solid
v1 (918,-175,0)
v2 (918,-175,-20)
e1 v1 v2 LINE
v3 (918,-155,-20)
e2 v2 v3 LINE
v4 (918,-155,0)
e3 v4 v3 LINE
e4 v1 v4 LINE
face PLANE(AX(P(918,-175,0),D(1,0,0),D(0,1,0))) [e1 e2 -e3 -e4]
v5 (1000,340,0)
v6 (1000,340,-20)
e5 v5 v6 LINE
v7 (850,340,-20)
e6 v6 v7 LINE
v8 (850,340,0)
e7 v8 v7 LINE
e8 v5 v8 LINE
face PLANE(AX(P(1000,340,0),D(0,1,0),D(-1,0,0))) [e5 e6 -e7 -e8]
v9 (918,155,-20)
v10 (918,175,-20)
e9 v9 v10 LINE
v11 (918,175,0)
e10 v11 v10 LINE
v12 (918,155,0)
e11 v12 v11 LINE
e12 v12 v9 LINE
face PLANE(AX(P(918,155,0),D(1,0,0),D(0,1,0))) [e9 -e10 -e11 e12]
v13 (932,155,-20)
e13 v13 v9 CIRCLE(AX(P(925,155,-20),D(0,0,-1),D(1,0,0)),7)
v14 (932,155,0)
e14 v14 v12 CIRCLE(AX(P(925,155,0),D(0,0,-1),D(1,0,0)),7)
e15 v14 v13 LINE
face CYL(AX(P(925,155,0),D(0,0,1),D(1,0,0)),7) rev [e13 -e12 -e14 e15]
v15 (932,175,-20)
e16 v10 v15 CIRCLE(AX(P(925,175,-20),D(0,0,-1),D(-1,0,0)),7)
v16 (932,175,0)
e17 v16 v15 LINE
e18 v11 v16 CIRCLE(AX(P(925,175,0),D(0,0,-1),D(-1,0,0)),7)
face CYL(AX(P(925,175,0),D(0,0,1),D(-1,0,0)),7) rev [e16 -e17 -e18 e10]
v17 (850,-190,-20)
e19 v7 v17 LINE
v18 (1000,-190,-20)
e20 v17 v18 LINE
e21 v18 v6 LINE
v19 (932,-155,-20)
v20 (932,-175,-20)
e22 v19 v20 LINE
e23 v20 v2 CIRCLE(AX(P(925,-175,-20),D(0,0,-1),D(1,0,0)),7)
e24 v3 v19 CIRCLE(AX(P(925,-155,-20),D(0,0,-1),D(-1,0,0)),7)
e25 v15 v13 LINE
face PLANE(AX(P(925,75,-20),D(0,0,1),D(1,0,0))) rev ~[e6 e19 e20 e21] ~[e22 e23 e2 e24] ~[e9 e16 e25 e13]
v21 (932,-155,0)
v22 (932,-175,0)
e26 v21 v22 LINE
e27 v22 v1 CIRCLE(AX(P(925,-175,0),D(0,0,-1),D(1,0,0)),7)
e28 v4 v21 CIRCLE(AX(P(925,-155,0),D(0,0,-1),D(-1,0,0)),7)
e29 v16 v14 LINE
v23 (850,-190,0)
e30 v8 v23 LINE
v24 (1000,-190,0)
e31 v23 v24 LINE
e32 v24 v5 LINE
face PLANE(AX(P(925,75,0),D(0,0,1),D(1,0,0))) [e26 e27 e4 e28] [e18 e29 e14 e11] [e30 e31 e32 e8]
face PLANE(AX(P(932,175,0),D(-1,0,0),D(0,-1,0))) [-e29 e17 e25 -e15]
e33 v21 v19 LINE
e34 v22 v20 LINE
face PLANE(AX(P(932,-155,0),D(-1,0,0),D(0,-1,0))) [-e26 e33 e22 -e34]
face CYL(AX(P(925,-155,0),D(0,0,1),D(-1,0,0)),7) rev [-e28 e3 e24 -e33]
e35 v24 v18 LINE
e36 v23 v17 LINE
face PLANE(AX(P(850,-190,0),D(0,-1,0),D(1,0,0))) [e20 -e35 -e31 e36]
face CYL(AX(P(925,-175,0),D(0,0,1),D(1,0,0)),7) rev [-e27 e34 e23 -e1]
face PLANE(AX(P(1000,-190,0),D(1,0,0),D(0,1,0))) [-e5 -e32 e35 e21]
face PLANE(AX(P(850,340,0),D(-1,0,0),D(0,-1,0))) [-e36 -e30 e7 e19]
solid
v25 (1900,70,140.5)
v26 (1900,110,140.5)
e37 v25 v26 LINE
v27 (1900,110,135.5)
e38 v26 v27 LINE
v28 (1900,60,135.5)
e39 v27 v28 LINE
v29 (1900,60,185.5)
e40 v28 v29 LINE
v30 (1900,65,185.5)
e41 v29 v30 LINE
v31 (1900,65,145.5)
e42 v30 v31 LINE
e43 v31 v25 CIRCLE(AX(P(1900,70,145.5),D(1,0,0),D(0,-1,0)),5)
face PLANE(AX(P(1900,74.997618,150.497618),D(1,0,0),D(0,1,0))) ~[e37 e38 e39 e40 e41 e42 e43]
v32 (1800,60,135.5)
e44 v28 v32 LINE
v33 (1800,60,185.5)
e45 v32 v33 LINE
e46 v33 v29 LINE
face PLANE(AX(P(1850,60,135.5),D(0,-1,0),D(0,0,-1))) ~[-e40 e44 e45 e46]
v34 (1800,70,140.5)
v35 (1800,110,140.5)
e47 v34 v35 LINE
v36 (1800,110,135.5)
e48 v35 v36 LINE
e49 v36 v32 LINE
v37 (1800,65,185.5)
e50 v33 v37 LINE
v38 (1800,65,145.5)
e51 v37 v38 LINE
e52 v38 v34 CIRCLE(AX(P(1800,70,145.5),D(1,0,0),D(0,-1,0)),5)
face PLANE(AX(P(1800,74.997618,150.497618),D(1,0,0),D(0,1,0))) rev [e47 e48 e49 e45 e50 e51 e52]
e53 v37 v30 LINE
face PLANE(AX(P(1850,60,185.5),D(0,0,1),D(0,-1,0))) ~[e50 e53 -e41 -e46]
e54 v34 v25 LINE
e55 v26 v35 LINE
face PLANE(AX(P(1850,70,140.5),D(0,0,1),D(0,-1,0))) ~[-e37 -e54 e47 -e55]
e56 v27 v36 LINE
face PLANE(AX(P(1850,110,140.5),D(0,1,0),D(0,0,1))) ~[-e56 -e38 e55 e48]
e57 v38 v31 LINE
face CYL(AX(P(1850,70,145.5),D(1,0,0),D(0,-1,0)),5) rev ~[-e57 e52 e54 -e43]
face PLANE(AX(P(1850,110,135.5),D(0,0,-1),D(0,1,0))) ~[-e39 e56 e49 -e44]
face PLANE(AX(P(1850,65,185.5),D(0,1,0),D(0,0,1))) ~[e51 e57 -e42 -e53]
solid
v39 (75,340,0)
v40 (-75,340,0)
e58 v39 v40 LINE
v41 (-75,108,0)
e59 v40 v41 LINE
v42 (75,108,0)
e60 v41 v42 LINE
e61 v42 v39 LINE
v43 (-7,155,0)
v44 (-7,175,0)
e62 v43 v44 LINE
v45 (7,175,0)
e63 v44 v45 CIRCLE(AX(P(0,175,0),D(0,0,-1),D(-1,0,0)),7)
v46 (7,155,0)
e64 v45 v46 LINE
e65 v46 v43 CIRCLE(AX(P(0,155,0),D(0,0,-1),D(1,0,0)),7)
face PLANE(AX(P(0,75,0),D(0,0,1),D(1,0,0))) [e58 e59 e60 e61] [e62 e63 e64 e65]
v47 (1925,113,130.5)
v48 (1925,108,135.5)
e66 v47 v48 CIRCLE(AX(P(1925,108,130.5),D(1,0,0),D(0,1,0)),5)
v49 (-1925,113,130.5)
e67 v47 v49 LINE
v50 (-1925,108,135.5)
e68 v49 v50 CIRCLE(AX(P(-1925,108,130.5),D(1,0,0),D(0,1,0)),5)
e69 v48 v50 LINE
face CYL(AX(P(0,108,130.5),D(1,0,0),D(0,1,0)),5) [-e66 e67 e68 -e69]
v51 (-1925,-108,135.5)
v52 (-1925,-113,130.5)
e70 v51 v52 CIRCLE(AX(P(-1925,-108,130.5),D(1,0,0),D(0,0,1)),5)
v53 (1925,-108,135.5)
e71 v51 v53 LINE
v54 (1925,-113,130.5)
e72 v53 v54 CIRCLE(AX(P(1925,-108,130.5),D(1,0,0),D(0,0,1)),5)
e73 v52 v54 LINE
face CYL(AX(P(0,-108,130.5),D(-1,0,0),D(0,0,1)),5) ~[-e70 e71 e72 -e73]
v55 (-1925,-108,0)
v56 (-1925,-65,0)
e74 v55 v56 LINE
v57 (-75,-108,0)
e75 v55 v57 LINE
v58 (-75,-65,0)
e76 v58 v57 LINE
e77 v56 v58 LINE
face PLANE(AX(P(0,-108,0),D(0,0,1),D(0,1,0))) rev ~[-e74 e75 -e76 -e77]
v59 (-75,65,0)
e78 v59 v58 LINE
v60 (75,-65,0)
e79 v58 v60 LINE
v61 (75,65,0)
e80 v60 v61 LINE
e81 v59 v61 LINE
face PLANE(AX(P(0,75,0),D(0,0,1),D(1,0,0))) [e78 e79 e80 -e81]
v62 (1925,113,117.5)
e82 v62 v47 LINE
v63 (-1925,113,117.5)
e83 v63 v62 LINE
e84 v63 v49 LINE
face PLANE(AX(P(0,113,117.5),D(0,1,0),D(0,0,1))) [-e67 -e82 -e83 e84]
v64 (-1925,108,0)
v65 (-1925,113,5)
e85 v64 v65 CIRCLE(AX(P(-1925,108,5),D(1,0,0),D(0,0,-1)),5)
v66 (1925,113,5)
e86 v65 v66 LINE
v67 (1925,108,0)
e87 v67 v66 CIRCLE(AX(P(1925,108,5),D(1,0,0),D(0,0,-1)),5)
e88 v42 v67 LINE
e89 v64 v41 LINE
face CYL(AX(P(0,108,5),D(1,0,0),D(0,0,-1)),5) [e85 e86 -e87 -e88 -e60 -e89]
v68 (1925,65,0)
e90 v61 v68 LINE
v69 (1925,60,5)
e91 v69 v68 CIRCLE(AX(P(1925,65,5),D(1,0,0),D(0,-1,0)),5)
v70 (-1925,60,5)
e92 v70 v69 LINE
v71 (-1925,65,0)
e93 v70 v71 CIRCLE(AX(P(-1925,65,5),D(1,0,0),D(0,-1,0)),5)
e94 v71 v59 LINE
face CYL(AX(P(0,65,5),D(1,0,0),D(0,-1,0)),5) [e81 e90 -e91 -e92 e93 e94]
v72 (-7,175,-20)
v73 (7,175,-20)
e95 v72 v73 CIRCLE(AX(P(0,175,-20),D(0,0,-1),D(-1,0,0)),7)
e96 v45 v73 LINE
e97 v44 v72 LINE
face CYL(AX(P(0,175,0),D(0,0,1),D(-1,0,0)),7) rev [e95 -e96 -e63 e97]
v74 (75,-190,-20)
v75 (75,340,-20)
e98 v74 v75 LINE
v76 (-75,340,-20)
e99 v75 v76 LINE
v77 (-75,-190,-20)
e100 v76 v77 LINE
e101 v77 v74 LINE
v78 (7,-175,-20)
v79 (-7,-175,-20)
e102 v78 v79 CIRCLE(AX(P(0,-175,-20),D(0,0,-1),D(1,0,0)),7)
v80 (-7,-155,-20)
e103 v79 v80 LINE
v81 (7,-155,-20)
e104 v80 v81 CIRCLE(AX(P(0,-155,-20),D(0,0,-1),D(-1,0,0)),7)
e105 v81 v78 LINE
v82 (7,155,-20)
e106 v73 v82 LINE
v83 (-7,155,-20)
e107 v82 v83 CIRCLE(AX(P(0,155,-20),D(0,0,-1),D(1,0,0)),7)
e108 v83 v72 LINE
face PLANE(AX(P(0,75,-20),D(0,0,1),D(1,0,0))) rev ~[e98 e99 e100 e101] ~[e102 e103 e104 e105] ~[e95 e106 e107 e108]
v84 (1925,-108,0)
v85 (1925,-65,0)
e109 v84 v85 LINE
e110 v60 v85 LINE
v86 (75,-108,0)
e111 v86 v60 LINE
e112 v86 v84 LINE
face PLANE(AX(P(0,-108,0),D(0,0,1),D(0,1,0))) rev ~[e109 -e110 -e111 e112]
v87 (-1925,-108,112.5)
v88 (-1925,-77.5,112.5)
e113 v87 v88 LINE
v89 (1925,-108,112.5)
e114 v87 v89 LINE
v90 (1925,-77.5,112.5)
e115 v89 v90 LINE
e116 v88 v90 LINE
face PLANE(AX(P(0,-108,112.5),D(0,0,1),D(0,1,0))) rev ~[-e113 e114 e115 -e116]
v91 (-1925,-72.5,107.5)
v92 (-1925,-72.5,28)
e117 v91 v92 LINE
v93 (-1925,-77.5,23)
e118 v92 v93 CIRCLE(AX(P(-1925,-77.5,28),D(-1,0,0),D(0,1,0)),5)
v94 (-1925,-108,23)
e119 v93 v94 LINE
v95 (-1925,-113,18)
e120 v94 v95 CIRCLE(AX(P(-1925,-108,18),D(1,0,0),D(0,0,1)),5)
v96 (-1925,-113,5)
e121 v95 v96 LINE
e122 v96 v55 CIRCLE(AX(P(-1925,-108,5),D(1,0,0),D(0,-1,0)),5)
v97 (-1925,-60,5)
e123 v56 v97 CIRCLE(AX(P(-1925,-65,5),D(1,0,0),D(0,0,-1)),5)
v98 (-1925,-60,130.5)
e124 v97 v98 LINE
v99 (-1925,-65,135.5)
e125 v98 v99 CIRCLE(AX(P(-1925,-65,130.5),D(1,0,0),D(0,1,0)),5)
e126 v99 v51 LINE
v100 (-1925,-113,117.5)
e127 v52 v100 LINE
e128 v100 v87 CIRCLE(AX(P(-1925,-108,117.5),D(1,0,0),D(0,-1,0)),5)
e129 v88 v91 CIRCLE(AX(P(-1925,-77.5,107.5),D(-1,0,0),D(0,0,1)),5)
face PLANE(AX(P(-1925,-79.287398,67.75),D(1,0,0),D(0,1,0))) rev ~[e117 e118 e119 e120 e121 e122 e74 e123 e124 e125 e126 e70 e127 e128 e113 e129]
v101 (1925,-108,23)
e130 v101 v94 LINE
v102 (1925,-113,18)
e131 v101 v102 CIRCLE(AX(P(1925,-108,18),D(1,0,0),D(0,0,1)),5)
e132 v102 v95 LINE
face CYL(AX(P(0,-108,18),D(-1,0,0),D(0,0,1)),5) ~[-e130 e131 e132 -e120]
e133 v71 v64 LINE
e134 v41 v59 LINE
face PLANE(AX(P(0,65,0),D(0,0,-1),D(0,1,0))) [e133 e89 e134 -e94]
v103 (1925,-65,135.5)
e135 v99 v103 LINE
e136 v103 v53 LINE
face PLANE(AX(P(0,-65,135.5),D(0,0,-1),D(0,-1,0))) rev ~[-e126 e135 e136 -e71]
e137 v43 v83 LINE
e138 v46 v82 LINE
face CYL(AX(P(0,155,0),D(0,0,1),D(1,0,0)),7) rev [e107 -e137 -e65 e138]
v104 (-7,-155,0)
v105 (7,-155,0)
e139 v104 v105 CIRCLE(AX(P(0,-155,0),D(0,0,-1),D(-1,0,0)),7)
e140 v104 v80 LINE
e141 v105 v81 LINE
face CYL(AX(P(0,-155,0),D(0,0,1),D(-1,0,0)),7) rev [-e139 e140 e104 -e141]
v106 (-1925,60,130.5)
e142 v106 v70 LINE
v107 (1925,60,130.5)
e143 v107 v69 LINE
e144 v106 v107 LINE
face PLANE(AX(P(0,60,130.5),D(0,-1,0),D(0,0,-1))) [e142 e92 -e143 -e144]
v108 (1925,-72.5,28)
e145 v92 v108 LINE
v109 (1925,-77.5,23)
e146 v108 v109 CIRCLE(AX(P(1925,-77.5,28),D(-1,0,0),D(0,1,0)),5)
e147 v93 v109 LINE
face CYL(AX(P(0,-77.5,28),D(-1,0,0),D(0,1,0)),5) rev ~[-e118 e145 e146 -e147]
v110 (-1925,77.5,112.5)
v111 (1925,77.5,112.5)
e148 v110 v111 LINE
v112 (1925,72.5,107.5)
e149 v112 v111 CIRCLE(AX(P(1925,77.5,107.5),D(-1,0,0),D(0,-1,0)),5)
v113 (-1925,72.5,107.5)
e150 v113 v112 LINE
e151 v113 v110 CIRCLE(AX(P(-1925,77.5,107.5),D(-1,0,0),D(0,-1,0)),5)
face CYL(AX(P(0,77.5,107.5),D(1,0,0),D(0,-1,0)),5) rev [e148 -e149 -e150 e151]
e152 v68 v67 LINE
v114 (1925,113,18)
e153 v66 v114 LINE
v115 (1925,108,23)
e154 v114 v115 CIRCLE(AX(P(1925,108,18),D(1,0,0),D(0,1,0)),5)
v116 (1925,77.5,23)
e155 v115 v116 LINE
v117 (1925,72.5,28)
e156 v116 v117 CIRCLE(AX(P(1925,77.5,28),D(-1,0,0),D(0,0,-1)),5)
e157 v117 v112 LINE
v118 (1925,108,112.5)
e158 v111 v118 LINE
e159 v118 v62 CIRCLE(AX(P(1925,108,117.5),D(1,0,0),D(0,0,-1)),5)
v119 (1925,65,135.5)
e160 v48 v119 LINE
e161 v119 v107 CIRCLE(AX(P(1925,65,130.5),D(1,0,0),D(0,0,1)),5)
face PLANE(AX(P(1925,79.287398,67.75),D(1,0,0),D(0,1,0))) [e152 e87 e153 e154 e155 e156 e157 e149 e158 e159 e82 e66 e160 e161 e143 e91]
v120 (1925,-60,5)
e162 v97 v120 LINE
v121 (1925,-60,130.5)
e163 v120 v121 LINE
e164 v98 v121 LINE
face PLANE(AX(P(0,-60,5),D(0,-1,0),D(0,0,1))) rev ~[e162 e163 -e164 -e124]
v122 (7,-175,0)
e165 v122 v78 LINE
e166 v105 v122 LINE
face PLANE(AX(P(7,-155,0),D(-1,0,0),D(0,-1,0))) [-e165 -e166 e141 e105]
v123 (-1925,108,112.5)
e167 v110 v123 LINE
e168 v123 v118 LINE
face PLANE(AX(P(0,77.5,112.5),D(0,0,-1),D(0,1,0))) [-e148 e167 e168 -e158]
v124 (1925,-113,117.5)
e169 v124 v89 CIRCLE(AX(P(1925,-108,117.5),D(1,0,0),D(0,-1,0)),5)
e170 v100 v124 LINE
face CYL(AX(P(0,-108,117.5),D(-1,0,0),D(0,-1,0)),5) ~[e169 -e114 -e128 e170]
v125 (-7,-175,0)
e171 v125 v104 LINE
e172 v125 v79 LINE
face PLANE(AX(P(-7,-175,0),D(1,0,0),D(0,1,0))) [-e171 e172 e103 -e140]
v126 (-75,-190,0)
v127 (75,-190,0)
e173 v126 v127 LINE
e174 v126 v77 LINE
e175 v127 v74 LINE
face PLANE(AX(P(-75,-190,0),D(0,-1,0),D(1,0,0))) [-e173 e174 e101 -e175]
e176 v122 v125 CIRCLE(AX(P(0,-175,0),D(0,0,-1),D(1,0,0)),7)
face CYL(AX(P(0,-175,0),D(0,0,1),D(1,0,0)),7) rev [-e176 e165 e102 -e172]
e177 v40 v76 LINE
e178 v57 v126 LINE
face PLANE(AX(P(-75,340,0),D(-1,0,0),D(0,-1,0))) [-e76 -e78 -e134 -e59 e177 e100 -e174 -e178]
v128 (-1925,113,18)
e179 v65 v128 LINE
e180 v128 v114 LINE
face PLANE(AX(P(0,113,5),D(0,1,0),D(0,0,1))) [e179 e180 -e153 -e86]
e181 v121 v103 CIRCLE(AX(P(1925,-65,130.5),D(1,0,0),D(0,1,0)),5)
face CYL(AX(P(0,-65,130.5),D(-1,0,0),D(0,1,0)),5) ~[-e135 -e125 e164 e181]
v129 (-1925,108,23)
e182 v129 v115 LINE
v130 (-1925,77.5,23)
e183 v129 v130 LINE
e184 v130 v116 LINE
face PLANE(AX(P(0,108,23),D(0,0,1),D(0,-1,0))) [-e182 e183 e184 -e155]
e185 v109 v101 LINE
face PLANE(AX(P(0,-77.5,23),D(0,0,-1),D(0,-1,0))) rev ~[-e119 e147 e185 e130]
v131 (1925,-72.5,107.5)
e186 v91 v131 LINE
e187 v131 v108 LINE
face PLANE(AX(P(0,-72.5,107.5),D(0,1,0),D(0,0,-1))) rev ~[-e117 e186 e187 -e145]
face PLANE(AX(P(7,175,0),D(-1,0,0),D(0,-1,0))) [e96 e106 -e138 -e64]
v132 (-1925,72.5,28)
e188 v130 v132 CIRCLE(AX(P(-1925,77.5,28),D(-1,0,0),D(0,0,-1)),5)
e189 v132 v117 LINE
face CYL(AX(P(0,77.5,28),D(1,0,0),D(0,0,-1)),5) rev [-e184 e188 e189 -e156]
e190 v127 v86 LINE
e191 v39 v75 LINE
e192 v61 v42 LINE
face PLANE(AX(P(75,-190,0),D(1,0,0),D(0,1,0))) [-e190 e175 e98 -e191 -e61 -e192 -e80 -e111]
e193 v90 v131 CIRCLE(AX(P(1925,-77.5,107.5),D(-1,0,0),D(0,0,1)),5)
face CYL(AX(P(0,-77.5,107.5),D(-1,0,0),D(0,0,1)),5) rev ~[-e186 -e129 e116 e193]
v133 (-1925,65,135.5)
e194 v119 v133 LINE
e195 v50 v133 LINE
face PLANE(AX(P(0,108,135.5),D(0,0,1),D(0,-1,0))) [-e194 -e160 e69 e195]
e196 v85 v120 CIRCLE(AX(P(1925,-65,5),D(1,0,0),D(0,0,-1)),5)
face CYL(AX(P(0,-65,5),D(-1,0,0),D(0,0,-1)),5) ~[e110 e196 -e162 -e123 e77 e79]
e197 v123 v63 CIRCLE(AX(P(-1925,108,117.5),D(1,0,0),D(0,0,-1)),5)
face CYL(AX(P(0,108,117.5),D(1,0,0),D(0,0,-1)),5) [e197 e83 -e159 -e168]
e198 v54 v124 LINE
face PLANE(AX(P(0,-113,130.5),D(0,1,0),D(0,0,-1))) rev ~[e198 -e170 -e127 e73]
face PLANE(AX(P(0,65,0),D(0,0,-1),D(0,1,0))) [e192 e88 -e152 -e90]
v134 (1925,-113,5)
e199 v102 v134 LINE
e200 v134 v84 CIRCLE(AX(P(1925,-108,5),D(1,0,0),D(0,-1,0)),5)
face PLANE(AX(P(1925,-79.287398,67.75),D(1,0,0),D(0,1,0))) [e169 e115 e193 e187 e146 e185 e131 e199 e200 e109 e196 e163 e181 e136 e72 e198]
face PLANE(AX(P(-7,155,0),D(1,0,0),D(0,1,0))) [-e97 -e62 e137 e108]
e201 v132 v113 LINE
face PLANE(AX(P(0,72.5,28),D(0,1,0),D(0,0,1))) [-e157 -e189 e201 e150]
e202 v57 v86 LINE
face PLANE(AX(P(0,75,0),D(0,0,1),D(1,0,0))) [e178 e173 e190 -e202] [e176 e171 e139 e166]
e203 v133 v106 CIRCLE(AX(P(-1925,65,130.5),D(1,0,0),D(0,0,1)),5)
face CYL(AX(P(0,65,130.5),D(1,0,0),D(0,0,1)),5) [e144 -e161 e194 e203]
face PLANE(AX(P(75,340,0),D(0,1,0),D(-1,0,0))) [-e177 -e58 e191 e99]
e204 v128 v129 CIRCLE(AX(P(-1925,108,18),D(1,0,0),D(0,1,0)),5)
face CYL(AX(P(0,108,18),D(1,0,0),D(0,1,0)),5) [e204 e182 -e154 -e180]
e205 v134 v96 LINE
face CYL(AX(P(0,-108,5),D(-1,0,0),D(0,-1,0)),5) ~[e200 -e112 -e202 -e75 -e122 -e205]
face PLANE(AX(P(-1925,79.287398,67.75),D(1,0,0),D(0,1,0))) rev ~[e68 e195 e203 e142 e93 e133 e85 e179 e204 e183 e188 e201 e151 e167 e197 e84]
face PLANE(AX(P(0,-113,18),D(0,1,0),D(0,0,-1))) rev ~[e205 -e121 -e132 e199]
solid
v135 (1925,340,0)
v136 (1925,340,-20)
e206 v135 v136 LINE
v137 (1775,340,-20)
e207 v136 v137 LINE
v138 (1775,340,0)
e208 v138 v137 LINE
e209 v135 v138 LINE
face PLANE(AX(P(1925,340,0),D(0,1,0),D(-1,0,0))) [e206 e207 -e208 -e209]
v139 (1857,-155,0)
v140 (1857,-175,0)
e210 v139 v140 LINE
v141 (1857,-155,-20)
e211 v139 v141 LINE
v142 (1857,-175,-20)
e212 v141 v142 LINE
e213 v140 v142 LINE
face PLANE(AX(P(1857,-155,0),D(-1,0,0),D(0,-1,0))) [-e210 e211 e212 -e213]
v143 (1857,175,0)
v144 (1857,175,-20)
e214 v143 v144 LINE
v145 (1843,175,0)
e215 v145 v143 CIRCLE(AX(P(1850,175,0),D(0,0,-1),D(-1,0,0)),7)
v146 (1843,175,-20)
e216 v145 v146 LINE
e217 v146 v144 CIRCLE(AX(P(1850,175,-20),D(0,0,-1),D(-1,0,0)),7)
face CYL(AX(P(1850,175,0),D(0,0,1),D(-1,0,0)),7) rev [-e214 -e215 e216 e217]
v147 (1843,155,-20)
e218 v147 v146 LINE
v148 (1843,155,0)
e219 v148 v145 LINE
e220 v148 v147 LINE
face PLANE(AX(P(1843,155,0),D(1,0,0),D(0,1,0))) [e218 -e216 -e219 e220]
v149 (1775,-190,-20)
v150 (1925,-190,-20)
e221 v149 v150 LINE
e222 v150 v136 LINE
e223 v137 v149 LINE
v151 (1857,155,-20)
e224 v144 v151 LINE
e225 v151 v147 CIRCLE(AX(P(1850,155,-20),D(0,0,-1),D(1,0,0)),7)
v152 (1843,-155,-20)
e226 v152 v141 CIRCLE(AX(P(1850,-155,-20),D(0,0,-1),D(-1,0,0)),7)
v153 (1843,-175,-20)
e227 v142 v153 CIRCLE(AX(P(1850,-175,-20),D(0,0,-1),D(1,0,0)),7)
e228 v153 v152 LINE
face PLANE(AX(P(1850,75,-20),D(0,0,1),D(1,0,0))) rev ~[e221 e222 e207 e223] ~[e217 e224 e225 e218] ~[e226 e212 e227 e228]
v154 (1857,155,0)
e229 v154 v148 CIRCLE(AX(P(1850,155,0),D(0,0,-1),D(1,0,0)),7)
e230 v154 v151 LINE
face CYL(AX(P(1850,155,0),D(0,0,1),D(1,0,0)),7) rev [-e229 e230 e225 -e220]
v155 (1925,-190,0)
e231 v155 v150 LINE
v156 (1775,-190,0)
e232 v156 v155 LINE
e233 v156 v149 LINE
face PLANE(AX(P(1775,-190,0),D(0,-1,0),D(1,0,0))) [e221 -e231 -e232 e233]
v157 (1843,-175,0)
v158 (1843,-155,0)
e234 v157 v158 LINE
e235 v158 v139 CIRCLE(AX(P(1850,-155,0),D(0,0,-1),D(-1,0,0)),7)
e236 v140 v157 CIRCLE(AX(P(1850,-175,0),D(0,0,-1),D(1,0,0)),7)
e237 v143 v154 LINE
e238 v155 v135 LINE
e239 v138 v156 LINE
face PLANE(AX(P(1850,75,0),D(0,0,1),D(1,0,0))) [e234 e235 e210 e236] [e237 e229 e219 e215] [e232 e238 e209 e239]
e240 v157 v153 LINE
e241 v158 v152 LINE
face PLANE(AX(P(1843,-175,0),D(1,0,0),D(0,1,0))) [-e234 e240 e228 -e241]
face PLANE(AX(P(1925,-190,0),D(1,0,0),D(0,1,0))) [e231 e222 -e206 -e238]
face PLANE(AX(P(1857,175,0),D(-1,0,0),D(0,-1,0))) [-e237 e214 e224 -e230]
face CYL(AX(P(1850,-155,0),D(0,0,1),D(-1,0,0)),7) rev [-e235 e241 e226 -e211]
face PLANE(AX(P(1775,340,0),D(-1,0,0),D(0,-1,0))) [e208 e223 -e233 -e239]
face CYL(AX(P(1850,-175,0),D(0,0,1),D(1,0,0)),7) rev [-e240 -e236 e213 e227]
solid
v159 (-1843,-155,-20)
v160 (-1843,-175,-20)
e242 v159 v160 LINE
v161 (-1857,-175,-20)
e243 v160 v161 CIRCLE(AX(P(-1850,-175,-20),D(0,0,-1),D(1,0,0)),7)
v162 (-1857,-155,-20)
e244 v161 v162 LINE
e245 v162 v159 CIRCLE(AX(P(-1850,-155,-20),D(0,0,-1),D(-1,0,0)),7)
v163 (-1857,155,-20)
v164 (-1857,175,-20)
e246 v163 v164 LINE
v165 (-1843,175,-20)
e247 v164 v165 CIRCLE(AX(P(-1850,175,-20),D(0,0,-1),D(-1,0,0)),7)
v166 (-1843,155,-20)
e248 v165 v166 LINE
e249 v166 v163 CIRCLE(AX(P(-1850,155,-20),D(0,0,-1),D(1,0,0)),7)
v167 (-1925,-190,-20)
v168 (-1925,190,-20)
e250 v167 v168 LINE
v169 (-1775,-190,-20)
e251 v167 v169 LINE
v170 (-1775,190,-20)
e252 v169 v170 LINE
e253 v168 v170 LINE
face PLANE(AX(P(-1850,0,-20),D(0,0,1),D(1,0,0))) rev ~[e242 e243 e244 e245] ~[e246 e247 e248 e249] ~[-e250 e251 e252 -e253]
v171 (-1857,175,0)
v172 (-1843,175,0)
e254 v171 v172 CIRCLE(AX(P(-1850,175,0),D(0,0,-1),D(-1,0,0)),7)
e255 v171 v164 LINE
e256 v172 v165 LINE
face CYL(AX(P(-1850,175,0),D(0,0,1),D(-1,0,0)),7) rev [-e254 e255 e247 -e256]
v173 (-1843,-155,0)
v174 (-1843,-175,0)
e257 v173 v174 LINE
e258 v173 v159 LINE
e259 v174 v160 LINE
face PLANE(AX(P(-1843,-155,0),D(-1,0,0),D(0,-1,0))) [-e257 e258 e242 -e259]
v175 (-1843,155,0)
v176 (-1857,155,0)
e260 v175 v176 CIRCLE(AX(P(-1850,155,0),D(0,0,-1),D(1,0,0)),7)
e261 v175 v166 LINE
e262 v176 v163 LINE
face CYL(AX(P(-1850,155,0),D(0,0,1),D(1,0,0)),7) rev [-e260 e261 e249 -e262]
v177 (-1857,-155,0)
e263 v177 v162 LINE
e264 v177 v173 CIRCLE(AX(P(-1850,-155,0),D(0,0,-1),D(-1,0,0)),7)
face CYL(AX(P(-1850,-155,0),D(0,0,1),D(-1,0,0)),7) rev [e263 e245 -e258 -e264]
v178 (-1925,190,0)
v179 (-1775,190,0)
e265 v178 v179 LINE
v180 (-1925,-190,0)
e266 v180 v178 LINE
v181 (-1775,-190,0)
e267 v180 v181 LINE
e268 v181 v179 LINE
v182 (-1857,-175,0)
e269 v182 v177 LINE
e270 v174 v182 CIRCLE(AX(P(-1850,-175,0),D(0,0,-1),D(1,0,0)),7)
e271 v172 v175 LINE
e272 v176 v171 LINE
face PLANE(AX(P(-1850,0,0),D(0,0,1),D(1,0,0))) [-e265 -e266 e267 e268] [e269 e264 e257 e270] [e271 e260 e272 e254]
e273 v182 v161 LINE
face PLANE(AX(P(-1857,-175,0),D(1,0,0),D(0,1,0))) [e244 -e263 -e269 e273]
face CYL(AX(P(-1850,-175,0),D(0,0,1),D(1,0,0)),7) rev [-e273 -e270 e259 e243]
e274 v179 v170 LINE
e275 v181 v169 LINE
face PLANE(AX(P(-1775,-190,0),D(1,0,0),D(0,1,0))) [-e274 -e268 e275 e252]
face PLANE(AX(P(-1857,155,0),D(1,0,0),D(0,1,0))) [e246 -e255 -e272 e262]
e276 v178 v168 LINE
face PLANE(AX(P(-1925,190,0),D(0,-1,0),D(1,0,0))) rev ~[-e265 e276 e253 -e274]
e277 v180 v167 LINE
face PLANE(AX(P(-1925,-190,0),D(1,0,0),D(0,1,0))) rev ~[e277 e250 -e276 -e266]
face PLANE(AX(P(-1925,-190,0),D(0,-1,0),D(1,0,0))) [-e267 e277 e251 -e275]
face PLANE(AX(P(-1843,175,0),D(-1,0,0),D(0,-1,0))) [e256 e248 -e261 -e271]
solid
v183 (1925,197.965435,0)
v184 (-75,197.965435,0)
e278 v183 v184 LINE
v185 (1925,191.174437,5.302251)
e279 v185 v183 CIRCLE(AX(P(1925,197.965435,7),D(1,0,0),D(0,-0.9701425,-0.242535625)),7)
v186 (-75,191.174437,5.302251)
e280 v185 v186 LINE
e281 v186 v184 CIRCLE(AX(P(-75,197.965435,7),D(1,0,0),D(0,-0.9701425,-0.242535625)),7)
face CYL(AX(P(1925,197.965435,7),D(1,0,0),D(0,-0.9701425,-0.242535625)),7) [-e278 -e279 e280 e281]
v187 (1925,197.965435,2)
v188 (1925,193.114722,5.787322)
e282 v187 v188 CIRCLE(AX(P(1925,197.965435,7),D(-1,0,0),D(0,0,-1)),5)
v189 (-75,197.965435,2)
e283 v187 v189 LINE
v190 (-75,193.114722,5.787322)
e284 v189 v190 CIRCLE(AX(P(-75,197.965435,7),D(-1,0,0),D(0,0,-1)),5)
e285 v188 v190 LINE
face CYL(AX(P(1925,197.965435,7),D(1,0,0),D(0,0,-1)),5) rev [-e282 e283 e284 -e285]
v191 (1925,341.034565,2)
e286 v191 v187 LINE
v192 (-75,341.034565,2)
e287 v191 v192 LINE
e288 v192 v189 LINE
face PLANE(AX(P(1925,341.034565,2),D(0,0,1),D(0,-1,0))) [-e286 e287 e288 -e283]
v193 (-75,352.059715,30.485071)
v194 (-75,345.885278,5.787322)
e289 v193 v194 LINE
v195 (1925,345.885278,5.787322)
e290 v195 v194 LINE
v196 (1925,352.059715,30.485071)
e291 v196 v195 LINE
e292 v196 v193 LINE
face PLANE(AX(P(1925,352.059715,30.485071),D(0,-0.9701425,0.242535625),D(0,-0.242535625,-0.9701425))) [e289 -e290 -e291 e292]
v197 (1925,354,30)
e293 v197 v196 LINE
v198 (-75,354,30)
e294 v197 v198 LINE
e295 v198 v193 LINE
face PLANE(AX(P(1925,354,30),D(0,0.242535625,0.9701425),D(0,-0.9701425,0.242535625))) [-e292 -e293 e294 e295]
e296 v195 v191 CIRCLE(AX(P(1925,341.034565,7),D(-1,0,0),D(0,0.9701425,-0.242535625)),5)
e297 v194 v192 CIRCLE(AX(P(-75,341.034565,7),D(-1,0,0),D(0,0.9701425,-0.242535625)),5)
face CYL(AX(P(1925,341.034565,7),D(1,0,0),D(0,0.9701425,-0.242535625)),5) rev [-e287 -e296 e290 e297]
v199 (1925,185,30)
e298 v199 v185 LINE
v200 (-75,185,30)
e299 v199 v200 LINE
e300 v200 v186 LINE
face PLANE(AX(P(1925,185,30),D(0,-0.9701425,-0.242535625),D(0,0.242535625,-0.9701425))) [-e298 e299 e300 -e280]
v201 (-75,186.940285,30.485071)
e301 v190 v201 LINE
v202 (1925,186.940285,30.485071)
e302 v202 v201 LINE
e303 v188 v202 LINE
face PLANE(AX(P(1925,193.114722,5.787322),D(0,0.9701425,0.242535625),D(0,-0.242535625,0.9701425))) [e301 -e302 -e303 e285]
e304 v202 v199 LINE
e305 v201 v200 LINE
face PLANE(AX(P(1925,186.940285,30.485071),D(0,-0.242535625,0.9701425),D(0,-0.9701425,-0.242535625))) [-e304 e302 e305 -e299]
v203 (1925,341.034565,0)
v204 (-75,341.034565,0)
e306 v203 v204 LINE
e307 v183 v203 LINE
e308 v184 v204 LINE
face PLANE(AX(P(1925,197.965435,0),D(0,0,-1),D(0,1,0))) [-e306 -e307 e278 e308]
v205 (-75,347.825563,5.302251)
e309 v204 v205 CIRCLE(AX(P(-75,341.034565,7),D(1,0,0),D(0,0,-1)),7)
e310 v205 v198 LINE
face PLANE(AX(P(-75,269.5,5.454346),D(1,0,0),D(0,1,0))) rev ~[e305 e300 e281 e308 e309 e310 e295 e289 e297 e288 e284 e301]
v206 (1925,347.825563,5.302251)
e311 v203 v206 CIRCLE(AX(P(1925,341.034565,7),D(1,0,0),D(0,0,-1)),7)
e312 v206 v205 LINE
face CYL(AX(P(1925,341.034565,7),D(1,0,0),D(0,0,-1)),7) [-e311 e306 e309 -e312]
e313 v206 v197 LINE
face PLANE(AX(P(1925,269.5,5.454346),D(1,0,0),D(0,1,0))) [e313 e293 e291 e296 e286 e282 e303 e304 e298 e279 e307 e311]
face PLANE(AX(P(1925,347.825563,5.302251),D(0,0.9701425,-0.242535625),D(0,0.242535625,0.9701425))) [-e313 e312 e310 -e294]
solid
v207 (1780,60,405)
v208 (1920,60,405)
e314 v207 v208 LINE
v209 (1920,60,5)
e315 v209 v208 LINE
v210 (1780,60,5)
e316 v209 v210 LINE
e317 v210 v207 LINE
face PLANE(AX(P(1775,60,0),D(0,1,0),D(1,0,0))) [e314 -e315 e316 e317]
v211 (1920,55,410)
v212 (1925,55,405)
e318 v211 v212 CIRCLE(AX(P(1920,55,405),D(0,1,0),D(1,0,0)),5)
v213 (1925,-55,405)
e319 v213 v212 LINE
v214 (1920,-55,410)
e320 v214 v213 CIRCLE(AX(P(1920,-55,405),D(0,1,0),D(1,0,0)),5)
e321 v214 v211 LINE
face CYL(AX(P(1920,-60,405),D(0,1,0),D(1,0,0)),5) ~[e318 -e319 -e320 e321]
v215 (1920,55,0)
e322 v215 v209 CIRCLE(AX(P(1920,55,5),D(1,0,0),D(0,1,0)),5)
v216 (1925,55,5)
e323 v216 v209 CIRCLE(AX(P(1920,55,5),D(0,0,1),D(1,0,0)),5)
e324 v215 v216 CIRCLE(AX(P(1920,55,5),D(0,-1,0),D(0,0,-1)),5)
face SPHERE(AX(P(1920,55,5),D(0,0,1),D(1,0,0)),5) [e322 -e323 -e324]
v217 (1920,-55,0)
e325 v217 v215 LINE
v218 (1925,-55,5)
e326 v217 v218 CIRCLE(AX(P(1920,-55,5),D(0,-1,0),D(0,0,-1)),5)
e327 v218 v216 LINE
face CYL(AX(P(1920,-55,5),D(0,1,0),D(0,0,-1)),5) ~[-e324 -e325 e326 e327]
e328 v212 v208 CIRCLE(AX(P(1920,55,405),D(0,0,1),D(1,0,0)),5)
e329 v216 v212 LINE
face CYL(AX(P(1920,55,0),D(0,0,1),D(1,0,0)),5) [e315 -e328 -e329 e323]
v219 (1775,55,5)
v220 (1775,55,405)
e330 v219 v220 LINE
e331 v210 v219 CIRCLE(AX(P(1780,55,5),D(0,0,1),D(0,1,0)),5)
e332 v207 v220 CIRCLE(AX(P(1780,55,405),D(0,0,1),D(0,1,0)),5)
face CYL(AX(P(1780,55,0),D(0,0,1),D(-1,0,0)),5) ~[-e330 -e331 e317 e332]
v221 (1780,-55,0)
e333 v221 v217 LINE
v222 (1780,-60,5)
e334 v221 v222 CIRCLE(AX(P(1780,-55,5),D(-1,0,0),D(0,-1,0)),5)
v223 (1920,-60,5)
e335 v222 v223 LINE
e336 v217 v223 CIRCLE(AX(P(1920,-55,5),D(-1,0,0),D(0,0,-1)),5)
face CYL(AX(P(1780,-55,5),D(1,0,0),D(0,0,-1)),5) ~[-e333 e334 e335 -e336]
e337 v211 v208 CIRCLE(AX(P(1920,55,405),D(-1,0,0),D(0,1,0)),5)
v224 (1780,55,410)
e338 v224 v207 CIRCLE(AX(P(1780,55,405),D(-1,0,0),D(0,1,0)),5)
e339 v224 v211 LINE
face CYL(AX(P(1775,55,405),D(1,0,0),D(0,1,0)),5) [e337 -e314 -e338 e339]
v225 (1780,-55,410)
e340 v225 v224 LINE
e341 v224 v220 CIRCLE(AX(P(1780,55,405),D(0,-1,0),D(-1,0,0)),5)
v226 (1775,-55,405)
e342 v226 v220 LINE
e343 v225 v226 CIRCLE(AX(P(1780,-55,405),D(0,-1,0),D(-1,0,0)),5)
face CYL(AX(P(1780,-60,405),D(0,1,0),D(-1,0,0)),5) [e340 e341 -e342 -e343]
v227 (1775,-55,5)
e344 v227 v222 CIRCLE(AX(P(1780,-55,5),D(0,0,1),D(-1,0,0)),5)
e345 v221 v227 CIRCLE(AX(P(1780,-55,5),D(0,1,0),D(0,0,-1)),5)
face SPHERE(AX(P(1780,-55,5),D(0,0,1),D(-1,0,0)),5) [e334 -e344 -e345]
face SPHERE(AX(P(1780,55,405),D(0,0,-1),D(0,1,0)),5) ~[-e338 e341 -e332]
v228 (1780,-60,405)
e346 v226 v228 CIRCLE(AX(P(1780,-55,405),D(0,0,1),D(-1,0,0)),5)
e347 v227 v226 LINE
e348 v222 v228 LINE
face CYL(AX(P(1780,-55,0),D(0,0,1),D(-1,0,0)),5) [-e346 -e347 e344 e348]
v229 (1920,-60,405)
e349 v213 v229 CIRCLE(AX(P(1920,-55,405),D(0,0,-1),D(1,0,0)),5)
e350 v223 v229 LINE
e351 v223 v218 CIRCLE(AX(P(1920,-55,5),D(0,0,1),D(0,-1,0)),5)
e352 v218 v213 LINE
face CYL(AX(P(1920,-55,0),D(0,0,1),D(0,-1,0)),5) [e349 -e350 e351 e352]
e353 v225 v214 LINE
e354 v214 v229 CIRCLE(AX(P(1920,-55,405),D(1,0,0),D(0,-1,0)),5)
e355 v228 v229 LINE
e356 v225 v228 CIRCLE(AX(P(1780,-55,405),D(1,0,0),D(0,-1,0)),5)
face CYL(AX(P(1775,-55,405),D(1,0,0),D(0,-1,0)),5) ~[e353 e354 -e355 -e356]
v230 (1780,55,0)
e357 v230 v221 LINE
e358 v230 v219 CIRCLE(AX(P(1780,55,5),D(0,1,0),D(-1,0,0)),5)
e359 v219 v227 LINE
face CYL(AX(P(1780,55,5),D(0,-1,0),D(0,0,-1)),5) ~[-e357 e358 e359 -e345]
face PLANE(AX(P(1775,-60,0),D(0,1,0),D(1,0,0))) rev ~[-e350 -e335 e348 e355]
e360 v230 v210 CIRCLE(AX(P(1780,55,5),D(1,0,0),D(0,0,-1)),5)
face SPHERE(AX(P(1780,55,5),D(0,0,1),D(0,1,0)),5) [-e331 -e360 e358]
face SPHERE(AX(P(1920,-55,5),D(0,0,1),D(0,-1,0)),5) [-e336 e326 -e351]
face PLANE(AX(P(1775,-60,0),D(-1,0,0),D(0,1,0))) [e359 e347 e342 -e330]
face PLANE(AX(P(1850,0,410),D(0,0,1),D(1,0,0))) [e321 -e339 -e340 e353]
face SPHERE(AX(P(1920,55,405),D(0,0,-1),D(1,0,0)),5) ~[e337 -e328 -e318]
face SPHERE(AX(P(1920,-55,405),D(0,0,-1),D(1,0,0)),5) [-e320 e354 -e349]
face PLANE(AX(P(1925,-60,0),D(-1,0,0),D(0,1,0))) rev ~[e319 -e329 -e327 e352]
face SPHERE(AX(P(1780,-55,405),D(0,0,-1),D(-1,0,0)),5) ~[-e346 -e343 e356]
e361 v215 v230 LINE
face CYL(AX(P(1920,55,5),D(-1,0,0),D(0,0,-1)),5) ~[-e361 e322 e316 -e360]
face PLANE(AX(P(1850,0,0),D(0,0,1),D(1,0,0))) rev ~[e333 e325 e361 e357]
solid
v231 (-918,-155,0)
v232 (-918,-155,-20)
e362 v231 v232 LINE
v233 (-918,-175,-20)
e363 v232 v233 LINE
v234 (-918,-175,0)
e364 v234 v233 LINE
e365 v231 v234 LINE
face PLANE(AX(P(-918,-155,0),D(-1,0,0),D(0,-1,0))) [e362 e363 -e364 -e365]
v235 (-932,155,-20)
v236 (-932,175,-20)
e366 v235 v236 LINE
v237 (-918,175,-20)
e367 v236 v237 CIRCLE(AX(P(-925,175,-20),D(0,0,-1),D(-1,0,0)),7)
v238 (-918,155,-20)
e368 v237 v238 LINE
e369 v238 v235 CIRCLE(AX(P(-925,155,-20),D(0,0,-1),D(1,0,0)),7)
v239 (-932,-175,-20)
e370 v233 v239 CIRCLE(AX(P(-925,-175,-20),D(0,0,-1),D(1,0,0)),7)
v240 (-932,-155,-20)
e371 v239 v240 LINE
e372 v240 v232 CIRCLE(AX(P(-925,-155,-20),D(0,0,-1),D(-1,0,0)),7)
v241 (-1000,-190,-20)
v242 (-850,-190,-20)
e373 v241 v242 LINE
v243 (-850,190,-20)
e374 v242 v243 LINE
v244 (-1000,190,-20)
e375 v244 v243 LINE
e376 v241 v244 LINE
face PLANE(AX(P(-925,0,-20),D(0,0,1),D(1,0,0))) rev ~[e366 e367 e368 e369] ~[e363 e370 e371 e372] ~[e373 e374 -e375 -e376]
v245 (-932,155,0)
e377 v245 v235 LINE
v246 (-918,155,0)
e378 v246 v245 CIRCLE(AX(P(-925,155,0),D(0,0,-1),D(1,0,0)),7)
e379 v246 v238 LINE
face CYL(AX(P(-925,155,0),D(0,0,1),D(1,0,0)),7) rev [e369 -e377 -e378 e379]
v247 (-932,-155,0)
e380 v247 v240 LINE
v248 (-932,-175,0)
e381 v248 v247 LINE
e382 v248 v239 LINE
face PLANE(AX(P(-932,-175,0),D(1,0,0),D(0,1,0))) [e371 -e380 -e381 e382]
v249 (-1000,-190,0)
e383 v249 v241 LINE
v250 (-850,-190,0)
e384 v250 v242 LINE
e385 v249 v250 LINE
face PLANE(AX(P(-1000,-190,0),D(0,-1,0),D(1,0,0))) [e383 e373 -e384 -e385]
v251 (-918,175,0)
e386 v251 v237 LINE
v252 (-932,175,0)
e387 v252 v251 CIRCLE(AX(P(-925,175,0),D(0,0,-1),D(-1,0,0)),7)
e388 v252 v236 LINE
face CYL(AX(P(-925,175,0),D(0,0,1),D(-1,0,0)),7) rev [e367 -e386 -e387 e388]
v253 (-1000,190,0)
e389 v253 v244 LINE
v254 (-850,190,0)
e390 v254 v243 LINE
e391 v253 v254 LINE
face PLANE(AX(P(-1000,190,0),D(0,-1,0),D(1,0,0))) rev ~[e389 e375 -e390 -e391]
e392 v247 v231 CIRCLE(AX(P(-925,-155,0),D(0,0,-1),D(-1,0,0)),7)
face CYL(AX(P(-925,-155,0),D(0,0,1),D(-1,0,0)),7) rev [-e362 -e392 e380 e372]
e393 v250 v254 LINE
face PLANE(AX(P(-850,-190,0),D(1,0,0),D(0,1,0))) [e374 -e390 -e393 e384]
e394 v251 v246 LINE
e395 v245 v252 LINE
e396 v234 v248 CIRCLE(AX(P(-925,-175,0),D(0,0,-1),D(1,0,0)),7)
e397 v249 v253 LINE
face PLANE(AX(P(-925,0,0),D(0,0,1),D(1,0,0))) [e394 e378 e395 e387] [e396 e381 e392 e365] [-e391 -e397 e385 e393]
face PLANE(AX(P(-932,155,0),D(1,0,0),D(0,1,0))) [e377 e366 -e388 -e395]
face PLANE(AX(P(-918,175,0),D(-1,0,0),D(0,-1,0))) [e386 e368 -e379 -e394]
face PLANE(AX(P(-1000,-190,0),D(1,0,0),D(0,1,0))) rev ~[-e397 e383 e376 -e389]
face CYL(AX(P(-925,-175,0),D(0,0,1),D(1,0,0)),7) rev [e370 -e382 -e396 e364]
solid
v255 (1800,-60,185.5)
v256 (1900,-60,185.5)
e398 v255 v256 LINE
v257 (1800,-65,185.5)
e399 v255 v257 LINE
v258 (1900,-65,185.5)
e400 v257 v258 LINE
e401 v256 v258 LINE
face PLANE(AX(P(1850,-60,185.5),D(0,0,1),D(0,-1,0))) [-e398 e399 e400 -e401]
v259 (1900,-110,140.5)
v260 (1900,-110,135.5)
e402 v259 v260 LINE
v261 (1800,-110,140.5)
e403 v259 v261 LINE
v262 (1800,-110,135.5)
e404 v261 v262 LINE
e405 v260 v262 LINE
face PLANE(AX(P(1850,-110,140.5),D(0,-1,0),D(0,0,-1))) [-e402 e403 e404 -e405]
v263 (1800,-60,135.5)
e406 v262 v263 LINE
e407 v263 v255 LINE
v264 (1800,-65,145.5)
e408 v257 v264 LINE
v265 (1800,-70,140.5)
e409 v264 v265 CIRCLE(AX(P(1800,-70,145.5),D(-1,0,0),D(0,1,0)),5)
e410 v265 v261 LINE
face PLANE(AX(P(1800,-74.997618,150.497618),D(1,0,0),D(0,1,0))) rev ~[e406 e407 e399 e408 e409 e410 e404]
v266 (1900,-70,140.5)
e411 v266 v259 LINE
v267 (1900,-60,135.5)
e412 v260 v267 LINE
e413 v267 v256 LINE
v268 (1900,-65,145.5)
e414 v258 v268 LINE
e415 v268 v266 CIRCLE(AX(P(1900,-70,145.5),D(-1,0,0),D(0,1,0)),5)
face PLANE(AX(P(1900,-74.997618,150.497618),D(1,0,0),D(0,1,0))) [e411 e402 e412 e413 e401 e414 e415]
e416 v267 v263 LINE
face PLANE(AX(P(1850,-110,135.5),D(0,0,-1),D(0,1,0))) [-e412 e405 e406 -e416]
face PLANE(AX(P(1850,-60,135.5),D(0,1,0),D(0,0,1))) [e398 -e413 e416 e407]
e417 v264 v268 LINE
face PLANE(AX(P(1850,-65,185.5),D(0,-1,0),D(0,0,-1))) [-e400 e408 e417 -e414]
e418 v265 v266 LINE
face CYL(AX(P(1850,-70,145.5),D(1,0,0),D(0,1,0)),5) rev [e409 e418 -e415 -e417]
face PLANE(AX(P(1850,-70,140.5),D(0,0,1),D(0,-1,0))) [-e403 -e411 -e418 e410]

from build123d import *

# Parameters (mm, degrees)
F0_W      = 150
F0_H      = 380
F1_DEPTH  = 20
F3_DEPTH  = 1925
F5_DEPTH  = 2000
F6_W      = 150
F6_H      = 120
F7_DEPTH  = 410
F8_R      = 5
F9_R      = 5
F12_DEPTH = 50


with BuildPart() as f1:
    # F0 (on Top) → F1 (new body)
    with BuildSketch(Plane.XY):
        with Locations((-1850, 0)):
            Rectangle(F0_W, F0_H)
        with BuildLine():
            ThreePointArc((-1843, -175), (-1850, -182), (-1857, -175))
            Line((-1857, -175), (-1857, -155))
            ThreePointArc((-1857, -155), (-1850, -148), (-1843, -155))
            Line((-1843, -155), (-1843, -175))
        make_face(mode=Mode.SUBTRACT)
        with BuildLine():
            Line((-1857, 155), (-1857, 175))
            ThreePointArc((-1857, 175), (-1850, 182), (-1843, 175))
            Line((-1843, 175), (-1843, 155))
            ThreePointArc((-1843, 155), (-1850, 148), (-1857, 155))
        make_face(mode=Mode.SUBTRACT)
    extrude(amount=-F1_DEPTH)


with BuildPart() as f1b:
    # F0 (on Top) → F1, piece 2 (new body)
    with BuildSketch(Plane.XY):
        with Locations((-925, 0)):
            Rectangle(F0_W, F0_H)
        with BuildLine():
            ThreePointArc((-918, -175), (-925, -182), (-932, -175))
            Line((-932, -175), (-932, -155))
            ThreePointArc((-932, -155), (-925, -148), (-918, -155))
            Line((-918, -155), (-918, -175))
        make_face(mode=Mode.SUBTRACT)
        with BuildLine():
            Line((-932, 155), (-932, 175))
            ThreePointArc((-932, 175), (-925, 182), (-918, 175))
            Line((-918, 175), (-918, 155))
            ThreePointArc((-918, 155), (-925, 148), (-932, 155))
        make_face(mode=Mode.SUBTRACT)
    extrude(amount=-F1_DEPTH)


with BuildPart() as f1c:
    # F0 (on Top) → F1, piece 3 (new body)
    with BuildSketch(Plane.XY):
        Polygon((-75, 190), (-75, -190), (75, -190), (75, 190), (75, 340), (-75, 340), align=None)
        with BuildLine():
            ThreePointArc((7, -175), (0, -182), (-7, -175))
            Line((-7, -175), (-7, -155))
            ThreePointArc((-7, -155), (0, -148), (7, -155))
            Line((7, -155), (7, -175))
        make_face(mode=Mode.SUBTRACT)
        with BuildLine():
            Line((-7, 155), (-7, 175))
            ThreePointArc((-7, 175), (0, 182), (7, 175))
            Line((7, 175), (7, 155))
            ThreePointArc((7, 155), (0, 148), (-7, 155))
        make_face(mode=Mode.SUBTRACT)
    extrude(amount=-F1_DEPTH)

    # F2 (on Right) → F3 (join, symmetric)
    with BuildSketch(Plane.YZ):
        with BuildLine():
            ThreePointArc((-113, 5), (-111.5355339059, 1.4644660941), (-108, 0))
            Line((-108, 0), (-65, 0))
            ThreePointArc((-65, 0), (-61.4644660941, 1.4644660941), (-60, 5))
            Line((-60, 5), (-60, 130.5))
            ThreePointArc((-60, 130.5), (-61.4644660941, 134.0355339059), (-65, 135.5))
            Line((-65, 135.5), (-108, 135.5))
            ThreePointArc((-108, 135.5), (-111.5355339059, 134.0355339059), (-113, 130.5))
            Line((-113, 130.5), (-113, 117.5))
            ThreePointArc((-113, 117.5), (-111.5355339059, 113.9644660941), (-108, 112.5))
            Line((-108, 112.5), (-77.5, 112.5))
            ThreePointArc((-77.5, 112.5), (-73.9644660941, 111.0355339059), (-72.5, 107.5))
            Line((-72.5, 107.5), (-72.5, 28))
            ThreePointArc((-72.5, 28), (-73.9644660941, 24.4644660941), (-77.5, 23))
            Line((-77.5, 23), (-108, 23))
            ThreePointArc((-108, 23), (-111.5355339059, 21.5355339059), (-113, 18))
            Line((-113, 18), (-113, 5))
        make_face()
        with BuildLine():
            ThreePointArc((65, 135.5), (61.4644660941, 134.0355339059), (60, 130.5))
            Line((60, 130.5), (60, 5))
            ThreePointArc((60, 5), (61.4644660941, 1.4644660941), (65, 0))
            Line((65, 0), (108, 0))
            ThreePointArc((108, 0), (111.5355339059, 1.4644660941), (113, 5))
            Line((113, 5), (113, 18))
            ThreePointArc((113, 18), (111.5355339059, 21.5355339059), (108, 23))
            Line((108, 23), (77.5, 23))
            ThreePointArc((77.5, 23), (73.9644660941, 24.4644660941), (72.5, 28))
            Line((72.5, 28), (72.5, 107.5))
            ThreePointArc((72.5, 107.5), (73.9644660941, 111.0355339059), (77.5, 112.5))
            Line((77.5, 112.5), (108, 112.5))
            ThreePointArc((108, 112.5), (111.5355339059, 113.9644660941), (113, 117.5))
            Line((113, 117.5), (113, 130.5))
            ThreePointArc((113, 130.5), (111.5355339059, 134.0355339059), (108, 135.5))
            Line((108, 135.5), (65, 135.5))
        make_face()
    extrude(amount=F3_DEPTH, both=True)


with BuildPart() as f1d:
    # F0 (on Top) → F1, piece 4 (new body)
    with BuildSketch(Plane.XY):
        Polygon((850, 190), (850, -190), (1000, -190), (1000, 190), (1000, 340), (850, 340), align=None)
        with BuildLine():
            ThreePointArc((932, -175), (925, -182), (918, -175))
            Line((918, -175), (918, -155))
            ThreePointArc((918, -155), (925, -148), (932, -155))
            Line((932, -155), (932, -175))
        make_face(mode=Mode.SUBTRACT)
        with BuildLine():
            Line((918, 155), (918, 175))
            ThreePointArc((918, 175), (925, 182), (932, 175))
            Line((932, 175), (932, 155))
            ThreePointArc((932, 155), (925, 148), (918, 155))
        make_face(mode=Mode.SUBTRACT)
    extrude(amount=-F1_DEPTH)


with BuildPart() as f1e:
    # F0 (on Top) → F1, piece 5 (new body)
    with BuildSketch(Plane.XY):
        Polygon((1775, 190), (1775, -190), (1925, -190), (1925, 190), (1925, 340), (1775, 340), align=None)
        with BuildLine():
            ThreePointArc((1857, -175), (1850, -182), (1843, -175))
            Line((1843, -175), (1843, -155))
            ThreePointArc((1843, -155), (1850, -148), (1857, -155))
            Line((1857, -155), (1857, -175))
        make_face(mode=Mode.SUBTRACT)
        with BuildLine():
            Line((1843, 155), (1843, 175))
            ThreePointArc((1843, 175), (1850, 182), (1857, 175))
            Line((1857, 175), (1857, 155))
            ThreePointArc((1857, 155), (1850, 148), (1843, 155))
        make_face(mode=Mode.SUBTRACT)
    extrude(amount=-F1_DEPTH)


with BuildPart() as f5:
    # F4 (on face) → F5 (new body, through all)
    with BuildSketch(Plane.YZ.offset(1925)):
        with BuildLine():
            Line((347.8255626562, 5.3022506247), (354, 30))
            Line((354, 30), (352.0597149997, 30.4850712501))
            Line((352.0597149997, 30.4850712501), (345.8852776559, 5.7873218748))
            ThreePointArc((345.8852776559, 5.7873218748), (344.1116262022, 3.0589728099), (341.0345651552, 2))
            Line((341.0345651552, 2), (269.5, 2))
            Line((269.5, 2), (197.9654348448, 2))
            ThreePointArc((197.9654348448, 2), (194.8883737978, 3.0589728099), (193.1147223441, 5.7873218748))
            Line((193.1147223441, 5.7873218748), (186.9402850003, 30.4850712501))
            Line((186.9402850003, 30.4850712501), (185, 30))
            Line((185, 30), (191.1744373438, 5.3022506247))
            ThreePointArc((191.1744373438, 5.3022506247), (193.657549379, 1.4825619339), (197.9654348448, 0))
            Line((197.9654348448, 0), (269.5, 0))
            Line((269.5, 0), (341.0345651552, 0))
            ThreePointArc((341.0345651552, 0), (345.342450621, 1.4825619339), (347.8255626562, 5.3022506247))
        make_face()
    extrude(amount=-F5_DEPTH)


with BuildPart() as f7:
    # F6 (on face) → F7 (new body)
    with BuildSketch(Plane.XY):
        with Locations((1850, 0)):
            Rectangle(F6_W, F6_H)
    extrude(amount=F7_DEPTH)

    # F8
    f8_edges = [f7.edges().sort_by_distance(p)[0] for p in [
        (1925, -60, 205),
        (1775, -60, 205),
        (1925, 60, 205),
        (1775, 60, 205),
        (1925, 0, 410),
        (1850, 60, 410),
        (1775, 0, 410),
        (1850, -60, 410),
    ]]
    fillet(f8_edges, radius=F8_R)

    # F9
    f9_edges = [f7.edges().sort_by_distance(p)[0] for p in [
        (1925, 0, 0),
        (1925, -55, 202.5),
        (1925, 55, 202.5),
        (1925, 0, 405),
    ]]
    fillet(f9_edges, radius=F9_R)


with BuildPart() as f12:
    # F11 (on offset) → F12 (new body, symmetric)
    with BuildSketch(Plane.YZ.offset(1850)):
        with BuildLine():
            Line((-63.6203959584, 135.5), (-60, 135.5))
            Line((-60, 135.5), (-60, 185.5))
            Line((-60, 185.5), (-65, 185.5))
            Line((-65, 185.5), (-65, 145.5))
            ThreePointArc((-65, 145.5), (-66.4644660941, 141.9644660941), (-70, 140.5))
            Line((-70, 140.5), (-110, 140.5))
            Line((-110, 140.5), (-110, 135.5))
            Line((-110, 135.5), (-108, 135.5))
            Line((-108, 135.5), (-63.6203959584, 135.5))
        make_face()
    extrude(amount=F12_DEPTH, both=True)


with BuildPart() as f13_1:
    # F13: instance of F12
    add(f12.part.mirror(Plane.XZ))


solid = Compound([f1.part, f1b.part, f1c.part, f1d.part, f1e.part, f5.part, f7.part, f12.part, f13_1.part])
